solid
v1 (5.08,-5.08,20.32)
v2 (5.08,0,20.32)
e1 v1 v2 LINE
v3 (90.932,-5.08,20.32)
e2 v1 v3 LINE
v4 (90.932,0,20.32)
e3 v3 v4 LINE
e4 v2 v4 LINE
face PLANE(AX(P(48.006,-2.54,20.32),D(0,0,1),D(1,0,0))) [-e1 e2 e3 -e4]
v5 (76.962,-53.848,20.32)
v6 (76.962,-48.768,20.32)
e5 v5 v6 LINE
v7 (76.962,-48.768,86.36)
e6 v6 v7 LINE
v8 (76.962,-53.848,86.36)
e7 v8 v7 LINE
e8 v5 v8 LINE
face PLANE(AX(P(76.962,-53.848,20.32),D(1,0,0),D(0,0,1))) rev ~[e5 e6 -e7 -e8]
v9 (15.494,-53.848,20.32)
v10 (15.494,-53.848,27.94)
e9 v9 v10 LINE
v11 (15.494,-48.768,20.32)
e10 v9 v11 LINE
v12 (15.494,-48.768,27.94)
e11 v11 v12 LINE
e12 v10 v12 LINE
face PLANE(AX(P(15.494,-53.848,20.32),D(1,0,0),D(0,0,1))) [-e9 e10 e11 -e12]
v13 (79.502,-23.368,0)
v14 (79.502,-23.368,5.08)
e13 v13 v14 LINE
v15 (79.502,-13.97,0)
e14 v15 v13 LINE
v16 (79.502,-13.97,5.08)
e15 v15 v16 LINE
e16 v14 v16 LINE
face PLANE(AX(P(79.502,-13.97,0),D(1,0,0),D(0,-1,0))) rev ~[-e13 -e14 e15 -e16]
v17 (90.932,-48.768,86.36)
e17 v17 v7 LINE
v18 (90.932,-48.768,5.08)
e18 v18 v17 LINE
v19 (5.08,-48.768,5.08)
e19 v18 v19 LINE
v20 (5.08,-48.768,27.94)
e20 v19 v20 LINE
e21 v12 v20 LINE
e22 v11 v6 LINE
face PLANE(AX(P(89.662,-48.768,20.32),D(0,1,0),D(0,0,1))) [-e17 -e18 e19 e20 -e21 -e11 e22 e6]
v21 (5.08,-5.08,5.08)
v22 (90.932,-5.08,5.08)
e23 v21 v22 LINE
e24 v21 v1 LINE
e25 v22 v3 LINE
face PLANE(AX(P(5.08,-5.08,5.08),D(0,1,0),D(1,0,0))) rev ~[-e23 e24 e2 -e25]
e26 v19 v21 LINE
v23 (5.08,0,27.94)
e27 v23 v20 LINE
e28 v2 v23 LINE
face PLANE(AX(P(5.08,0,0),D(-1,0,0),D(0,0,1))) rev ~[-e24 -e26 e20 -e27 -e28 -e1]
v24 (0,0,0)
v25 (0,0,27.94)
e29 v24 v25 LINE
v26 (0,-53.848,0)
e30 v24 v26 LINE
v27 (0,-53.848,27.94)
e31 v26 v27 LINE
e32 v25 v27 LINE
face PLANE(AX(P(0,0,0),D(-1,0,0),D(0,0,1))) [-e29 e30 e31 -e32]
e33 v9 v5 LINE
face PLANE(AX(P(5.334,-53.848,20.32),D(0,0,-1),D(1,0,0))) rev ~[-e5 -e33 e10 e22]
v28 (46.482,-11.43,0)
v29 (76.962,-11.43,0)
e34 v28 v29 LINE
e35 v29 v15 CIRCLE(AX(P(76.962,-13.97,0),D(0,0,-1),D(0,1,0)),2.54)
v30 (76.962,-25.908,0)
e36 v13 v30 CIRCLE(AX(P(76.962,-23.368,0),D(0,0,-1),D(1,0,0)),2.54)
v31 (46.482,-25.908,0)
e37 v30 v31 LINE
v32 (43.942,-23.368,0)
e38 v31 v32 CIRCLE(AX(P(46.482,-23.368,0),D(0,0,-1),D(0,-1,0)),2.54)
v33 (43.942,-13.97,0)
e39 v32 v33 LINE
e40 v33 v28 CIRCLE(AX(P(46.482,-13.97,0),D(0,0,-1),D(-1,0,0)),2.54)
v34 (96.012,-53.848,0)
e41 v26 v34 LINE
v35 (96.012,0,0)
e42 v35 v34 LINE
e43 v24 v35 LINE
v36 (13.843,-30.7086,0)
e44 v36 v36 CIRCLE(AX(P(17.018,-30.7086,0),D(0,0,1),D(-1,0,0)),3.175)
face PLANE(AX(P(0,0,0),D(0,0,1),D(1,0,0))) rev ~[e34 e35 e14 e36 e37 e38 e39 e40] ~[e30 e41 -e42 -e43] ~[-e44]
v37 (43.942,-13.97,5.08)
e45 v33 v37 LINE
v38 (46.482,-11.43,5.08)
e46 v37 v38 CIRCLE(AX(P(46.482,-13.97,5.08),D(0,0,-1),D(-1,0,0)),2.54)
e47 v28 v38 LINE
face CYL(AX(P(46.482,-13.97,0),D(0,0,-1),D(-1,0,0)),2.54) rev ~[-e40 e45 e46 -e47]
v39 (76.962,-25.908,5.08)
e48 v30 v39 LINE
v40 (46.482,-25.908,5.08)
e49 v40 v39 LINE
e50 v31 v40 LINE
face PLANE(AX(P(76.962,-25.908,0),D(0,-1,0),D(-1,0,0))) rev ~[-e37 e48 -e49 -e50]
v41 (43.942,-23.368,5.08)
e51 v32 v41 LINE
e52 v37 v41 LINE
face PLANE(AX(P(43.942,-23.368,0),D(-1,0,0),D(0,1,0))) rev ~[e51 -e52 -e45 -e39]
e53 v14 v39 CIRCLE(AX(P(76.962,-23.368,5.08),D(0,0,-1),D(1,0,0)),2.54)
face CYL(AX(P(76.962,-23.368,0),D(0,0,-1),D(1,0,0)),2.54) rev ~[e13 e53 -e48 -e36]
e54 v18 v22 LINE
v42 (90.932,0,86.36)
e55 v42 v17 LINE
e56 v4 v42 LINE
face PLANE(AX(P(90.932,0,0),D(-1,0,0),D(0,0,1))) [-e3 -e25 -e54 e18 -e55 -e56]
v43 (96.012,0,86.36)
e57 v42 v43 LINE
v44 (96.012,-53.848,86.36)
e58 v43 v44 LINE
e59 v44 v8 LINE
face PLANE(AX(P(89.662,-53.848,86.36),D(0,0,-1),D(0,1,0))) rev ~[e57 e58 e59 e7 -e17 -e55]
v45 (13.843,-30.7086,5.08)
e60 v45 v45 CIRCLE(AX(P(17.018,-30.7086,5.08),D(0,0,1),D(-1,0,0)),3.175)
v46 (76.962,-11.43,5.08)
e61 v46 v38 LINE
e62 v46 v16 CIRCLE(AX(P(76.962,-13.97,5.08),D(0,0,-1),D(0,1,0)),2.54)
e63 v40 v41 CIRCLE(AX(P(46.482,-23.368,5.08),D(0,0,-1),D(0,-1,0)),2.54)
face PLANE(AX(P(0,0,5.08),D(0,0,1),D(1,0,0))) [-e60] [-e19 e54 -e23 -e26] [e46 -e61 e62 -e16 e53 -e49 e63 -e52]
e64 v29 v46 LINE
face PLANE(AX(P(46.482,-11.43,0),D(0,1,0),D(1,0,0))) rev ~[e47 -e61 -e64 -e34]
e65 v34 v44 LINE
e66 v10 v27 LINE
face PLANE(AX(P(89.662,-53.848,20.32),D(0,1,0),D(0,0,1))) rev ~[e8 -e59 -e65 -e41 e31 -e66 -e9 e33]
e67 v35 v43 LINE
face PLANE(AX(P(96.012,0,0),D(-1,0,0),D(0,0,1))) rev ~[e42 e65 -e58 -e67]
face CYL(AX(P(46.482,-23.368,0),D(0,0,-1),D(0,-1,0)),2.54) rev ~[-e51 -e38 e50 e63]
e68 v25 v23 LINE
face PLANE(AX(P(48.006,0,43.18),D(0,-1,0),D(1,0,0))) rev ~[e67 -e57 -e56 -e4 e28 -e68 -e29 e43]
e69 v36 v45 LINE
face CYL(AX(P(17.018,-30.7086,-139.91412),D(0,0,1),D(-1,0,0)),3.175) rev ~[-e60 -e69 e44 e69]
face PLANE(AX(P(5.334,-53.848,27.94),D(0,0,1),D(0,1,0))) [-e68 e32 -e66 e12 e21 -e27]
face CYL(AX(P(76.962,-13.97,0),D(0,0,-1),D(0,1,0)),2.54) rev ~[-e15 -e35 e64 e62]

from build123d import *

# Parameters (mm, degrees)
F0_W      = 96.012
F0_H      = 86.36
F1_DEPTH  = 53.848
F2_T      = -5.08
F4_D      = 6.35
F6_DEPTH  = 25.4
F7_W      = 84.328
F7_H      = 66.04
F8_DEPTH  = 25.4
F9_W      = 53.848
F9_H      = 58.42
F10_DEPTH = 25.4
F11_W     = 85.852
F11_H     = 5.08
F12_DEPTH = 15.24
F13_DEPTH = 10.16
F14_DEPTH = 12.7


# Not quite as in the source:
# - a feature names something its author has since deleted; it is built from what else it names


with BuildPart() as f1:
    # F0 (on Front) → F1 (new body)
    with BuildSketch(Plane.XZ):
        with Locations((48.006, 43.18)):
            Rectangle(F0_W, F0_H)
    extrude(amount=F1_DEPTH)

    # F2
    f2_openings = [f1.faces().sort_by_distance(p)[0] for p in [
        (48.006, -26.924, 86.36),
        (48.006, 0, 43.18),
    ]]
    offset(amount=F2_T, openings=f2_openings)

    # F4 (through all)
    with Locations(Plane(origin=(0, 0, 0), x_dir=(1, 0, 0), z_dir=(0, 0, -1))):
        with Locations((17.018, 30.7086)):
            Hole(F4_D / 2)

    # F5 (on face) → F6 (cut)
    with BuildSketch(Plane(origin=(0, 0, 0), x_dir=(1, 0, 0), z_dir=(0, 0, -1))):
        with BuildLine():
            Line((76.962, 25.908), (46.482, 25.908))
            ThreePointArc((46.482, 25.908), (44.6859487758, 25.1640512242), (43.942, 23.368))
            Line((43.942, 23.368), (43.942, 13.97))
            ThreePointArc((43.942, 13.97), (44.6859487758, 12.1739487758), (46.482, 11.43))
            Line((46.482, 11.43), (76.962, 11.43))
            ThreePointArc((76.962, 11.43), (78.7580512242, 12.1739487758), (79.502, 13.97))
            Line((79.502, 13.97), (79.502, 23.368))
            ThreePointArc((79.502, 23.368), (78.7580512242, 25.1640512242), (76.962, 25.908))
        make_face()
    extrude(amount=-F6_DEPTH, mode=Mode.SUBTRACT)

    # F7 (on face) → F8 (cut)
    with BuildSketch(Plane.XZ.offset(53.848)):
        with Locations((47.498, 53.34)):
            Rectangle(F7_W, F7_H)
    extrude(amount=-F8_DEPTH, mode=Mode.SUBTRACT)

    # F9 (on face) → F10 (cut)
    with BuildSketch(Plane(origin=(0, 0, 0), x_dir=(0, -1, 0), z_dir=(-1, 0, 0))):
        with Locations((26.924, 57.15)):
            Rectangle(F9_W, F9_H)
    extrude(amount=-F10_DEPTH, mode=Mode.SUBTRACT)

    # F11 (on face) → F12 (join)
    with BuildSketch(Plane.XY.offset(5.08)):
        with Locations((48.006, -2.54)):
            Rectangle(F11_W, F11_H)
    extrude(amount=F12_DEPTH)

    # F13 (add): a face of the model
    f13_faces = [f1.faces().sort_by_distance(p)[0] for p in [
        (5.334, -51.308, 24.13),
    ]]
    extrude(f13_faces, amount=F13_DEPTH)

    # F14 (add): a face of the model
    f14_faces = [f1.faces().sort_by_distance(p)[0] for p in [
        (89.662, -51.308, 53.34),
    ]]
    extrude(f14_faces, amount=F14_DEPTH)


solid = f1.part
